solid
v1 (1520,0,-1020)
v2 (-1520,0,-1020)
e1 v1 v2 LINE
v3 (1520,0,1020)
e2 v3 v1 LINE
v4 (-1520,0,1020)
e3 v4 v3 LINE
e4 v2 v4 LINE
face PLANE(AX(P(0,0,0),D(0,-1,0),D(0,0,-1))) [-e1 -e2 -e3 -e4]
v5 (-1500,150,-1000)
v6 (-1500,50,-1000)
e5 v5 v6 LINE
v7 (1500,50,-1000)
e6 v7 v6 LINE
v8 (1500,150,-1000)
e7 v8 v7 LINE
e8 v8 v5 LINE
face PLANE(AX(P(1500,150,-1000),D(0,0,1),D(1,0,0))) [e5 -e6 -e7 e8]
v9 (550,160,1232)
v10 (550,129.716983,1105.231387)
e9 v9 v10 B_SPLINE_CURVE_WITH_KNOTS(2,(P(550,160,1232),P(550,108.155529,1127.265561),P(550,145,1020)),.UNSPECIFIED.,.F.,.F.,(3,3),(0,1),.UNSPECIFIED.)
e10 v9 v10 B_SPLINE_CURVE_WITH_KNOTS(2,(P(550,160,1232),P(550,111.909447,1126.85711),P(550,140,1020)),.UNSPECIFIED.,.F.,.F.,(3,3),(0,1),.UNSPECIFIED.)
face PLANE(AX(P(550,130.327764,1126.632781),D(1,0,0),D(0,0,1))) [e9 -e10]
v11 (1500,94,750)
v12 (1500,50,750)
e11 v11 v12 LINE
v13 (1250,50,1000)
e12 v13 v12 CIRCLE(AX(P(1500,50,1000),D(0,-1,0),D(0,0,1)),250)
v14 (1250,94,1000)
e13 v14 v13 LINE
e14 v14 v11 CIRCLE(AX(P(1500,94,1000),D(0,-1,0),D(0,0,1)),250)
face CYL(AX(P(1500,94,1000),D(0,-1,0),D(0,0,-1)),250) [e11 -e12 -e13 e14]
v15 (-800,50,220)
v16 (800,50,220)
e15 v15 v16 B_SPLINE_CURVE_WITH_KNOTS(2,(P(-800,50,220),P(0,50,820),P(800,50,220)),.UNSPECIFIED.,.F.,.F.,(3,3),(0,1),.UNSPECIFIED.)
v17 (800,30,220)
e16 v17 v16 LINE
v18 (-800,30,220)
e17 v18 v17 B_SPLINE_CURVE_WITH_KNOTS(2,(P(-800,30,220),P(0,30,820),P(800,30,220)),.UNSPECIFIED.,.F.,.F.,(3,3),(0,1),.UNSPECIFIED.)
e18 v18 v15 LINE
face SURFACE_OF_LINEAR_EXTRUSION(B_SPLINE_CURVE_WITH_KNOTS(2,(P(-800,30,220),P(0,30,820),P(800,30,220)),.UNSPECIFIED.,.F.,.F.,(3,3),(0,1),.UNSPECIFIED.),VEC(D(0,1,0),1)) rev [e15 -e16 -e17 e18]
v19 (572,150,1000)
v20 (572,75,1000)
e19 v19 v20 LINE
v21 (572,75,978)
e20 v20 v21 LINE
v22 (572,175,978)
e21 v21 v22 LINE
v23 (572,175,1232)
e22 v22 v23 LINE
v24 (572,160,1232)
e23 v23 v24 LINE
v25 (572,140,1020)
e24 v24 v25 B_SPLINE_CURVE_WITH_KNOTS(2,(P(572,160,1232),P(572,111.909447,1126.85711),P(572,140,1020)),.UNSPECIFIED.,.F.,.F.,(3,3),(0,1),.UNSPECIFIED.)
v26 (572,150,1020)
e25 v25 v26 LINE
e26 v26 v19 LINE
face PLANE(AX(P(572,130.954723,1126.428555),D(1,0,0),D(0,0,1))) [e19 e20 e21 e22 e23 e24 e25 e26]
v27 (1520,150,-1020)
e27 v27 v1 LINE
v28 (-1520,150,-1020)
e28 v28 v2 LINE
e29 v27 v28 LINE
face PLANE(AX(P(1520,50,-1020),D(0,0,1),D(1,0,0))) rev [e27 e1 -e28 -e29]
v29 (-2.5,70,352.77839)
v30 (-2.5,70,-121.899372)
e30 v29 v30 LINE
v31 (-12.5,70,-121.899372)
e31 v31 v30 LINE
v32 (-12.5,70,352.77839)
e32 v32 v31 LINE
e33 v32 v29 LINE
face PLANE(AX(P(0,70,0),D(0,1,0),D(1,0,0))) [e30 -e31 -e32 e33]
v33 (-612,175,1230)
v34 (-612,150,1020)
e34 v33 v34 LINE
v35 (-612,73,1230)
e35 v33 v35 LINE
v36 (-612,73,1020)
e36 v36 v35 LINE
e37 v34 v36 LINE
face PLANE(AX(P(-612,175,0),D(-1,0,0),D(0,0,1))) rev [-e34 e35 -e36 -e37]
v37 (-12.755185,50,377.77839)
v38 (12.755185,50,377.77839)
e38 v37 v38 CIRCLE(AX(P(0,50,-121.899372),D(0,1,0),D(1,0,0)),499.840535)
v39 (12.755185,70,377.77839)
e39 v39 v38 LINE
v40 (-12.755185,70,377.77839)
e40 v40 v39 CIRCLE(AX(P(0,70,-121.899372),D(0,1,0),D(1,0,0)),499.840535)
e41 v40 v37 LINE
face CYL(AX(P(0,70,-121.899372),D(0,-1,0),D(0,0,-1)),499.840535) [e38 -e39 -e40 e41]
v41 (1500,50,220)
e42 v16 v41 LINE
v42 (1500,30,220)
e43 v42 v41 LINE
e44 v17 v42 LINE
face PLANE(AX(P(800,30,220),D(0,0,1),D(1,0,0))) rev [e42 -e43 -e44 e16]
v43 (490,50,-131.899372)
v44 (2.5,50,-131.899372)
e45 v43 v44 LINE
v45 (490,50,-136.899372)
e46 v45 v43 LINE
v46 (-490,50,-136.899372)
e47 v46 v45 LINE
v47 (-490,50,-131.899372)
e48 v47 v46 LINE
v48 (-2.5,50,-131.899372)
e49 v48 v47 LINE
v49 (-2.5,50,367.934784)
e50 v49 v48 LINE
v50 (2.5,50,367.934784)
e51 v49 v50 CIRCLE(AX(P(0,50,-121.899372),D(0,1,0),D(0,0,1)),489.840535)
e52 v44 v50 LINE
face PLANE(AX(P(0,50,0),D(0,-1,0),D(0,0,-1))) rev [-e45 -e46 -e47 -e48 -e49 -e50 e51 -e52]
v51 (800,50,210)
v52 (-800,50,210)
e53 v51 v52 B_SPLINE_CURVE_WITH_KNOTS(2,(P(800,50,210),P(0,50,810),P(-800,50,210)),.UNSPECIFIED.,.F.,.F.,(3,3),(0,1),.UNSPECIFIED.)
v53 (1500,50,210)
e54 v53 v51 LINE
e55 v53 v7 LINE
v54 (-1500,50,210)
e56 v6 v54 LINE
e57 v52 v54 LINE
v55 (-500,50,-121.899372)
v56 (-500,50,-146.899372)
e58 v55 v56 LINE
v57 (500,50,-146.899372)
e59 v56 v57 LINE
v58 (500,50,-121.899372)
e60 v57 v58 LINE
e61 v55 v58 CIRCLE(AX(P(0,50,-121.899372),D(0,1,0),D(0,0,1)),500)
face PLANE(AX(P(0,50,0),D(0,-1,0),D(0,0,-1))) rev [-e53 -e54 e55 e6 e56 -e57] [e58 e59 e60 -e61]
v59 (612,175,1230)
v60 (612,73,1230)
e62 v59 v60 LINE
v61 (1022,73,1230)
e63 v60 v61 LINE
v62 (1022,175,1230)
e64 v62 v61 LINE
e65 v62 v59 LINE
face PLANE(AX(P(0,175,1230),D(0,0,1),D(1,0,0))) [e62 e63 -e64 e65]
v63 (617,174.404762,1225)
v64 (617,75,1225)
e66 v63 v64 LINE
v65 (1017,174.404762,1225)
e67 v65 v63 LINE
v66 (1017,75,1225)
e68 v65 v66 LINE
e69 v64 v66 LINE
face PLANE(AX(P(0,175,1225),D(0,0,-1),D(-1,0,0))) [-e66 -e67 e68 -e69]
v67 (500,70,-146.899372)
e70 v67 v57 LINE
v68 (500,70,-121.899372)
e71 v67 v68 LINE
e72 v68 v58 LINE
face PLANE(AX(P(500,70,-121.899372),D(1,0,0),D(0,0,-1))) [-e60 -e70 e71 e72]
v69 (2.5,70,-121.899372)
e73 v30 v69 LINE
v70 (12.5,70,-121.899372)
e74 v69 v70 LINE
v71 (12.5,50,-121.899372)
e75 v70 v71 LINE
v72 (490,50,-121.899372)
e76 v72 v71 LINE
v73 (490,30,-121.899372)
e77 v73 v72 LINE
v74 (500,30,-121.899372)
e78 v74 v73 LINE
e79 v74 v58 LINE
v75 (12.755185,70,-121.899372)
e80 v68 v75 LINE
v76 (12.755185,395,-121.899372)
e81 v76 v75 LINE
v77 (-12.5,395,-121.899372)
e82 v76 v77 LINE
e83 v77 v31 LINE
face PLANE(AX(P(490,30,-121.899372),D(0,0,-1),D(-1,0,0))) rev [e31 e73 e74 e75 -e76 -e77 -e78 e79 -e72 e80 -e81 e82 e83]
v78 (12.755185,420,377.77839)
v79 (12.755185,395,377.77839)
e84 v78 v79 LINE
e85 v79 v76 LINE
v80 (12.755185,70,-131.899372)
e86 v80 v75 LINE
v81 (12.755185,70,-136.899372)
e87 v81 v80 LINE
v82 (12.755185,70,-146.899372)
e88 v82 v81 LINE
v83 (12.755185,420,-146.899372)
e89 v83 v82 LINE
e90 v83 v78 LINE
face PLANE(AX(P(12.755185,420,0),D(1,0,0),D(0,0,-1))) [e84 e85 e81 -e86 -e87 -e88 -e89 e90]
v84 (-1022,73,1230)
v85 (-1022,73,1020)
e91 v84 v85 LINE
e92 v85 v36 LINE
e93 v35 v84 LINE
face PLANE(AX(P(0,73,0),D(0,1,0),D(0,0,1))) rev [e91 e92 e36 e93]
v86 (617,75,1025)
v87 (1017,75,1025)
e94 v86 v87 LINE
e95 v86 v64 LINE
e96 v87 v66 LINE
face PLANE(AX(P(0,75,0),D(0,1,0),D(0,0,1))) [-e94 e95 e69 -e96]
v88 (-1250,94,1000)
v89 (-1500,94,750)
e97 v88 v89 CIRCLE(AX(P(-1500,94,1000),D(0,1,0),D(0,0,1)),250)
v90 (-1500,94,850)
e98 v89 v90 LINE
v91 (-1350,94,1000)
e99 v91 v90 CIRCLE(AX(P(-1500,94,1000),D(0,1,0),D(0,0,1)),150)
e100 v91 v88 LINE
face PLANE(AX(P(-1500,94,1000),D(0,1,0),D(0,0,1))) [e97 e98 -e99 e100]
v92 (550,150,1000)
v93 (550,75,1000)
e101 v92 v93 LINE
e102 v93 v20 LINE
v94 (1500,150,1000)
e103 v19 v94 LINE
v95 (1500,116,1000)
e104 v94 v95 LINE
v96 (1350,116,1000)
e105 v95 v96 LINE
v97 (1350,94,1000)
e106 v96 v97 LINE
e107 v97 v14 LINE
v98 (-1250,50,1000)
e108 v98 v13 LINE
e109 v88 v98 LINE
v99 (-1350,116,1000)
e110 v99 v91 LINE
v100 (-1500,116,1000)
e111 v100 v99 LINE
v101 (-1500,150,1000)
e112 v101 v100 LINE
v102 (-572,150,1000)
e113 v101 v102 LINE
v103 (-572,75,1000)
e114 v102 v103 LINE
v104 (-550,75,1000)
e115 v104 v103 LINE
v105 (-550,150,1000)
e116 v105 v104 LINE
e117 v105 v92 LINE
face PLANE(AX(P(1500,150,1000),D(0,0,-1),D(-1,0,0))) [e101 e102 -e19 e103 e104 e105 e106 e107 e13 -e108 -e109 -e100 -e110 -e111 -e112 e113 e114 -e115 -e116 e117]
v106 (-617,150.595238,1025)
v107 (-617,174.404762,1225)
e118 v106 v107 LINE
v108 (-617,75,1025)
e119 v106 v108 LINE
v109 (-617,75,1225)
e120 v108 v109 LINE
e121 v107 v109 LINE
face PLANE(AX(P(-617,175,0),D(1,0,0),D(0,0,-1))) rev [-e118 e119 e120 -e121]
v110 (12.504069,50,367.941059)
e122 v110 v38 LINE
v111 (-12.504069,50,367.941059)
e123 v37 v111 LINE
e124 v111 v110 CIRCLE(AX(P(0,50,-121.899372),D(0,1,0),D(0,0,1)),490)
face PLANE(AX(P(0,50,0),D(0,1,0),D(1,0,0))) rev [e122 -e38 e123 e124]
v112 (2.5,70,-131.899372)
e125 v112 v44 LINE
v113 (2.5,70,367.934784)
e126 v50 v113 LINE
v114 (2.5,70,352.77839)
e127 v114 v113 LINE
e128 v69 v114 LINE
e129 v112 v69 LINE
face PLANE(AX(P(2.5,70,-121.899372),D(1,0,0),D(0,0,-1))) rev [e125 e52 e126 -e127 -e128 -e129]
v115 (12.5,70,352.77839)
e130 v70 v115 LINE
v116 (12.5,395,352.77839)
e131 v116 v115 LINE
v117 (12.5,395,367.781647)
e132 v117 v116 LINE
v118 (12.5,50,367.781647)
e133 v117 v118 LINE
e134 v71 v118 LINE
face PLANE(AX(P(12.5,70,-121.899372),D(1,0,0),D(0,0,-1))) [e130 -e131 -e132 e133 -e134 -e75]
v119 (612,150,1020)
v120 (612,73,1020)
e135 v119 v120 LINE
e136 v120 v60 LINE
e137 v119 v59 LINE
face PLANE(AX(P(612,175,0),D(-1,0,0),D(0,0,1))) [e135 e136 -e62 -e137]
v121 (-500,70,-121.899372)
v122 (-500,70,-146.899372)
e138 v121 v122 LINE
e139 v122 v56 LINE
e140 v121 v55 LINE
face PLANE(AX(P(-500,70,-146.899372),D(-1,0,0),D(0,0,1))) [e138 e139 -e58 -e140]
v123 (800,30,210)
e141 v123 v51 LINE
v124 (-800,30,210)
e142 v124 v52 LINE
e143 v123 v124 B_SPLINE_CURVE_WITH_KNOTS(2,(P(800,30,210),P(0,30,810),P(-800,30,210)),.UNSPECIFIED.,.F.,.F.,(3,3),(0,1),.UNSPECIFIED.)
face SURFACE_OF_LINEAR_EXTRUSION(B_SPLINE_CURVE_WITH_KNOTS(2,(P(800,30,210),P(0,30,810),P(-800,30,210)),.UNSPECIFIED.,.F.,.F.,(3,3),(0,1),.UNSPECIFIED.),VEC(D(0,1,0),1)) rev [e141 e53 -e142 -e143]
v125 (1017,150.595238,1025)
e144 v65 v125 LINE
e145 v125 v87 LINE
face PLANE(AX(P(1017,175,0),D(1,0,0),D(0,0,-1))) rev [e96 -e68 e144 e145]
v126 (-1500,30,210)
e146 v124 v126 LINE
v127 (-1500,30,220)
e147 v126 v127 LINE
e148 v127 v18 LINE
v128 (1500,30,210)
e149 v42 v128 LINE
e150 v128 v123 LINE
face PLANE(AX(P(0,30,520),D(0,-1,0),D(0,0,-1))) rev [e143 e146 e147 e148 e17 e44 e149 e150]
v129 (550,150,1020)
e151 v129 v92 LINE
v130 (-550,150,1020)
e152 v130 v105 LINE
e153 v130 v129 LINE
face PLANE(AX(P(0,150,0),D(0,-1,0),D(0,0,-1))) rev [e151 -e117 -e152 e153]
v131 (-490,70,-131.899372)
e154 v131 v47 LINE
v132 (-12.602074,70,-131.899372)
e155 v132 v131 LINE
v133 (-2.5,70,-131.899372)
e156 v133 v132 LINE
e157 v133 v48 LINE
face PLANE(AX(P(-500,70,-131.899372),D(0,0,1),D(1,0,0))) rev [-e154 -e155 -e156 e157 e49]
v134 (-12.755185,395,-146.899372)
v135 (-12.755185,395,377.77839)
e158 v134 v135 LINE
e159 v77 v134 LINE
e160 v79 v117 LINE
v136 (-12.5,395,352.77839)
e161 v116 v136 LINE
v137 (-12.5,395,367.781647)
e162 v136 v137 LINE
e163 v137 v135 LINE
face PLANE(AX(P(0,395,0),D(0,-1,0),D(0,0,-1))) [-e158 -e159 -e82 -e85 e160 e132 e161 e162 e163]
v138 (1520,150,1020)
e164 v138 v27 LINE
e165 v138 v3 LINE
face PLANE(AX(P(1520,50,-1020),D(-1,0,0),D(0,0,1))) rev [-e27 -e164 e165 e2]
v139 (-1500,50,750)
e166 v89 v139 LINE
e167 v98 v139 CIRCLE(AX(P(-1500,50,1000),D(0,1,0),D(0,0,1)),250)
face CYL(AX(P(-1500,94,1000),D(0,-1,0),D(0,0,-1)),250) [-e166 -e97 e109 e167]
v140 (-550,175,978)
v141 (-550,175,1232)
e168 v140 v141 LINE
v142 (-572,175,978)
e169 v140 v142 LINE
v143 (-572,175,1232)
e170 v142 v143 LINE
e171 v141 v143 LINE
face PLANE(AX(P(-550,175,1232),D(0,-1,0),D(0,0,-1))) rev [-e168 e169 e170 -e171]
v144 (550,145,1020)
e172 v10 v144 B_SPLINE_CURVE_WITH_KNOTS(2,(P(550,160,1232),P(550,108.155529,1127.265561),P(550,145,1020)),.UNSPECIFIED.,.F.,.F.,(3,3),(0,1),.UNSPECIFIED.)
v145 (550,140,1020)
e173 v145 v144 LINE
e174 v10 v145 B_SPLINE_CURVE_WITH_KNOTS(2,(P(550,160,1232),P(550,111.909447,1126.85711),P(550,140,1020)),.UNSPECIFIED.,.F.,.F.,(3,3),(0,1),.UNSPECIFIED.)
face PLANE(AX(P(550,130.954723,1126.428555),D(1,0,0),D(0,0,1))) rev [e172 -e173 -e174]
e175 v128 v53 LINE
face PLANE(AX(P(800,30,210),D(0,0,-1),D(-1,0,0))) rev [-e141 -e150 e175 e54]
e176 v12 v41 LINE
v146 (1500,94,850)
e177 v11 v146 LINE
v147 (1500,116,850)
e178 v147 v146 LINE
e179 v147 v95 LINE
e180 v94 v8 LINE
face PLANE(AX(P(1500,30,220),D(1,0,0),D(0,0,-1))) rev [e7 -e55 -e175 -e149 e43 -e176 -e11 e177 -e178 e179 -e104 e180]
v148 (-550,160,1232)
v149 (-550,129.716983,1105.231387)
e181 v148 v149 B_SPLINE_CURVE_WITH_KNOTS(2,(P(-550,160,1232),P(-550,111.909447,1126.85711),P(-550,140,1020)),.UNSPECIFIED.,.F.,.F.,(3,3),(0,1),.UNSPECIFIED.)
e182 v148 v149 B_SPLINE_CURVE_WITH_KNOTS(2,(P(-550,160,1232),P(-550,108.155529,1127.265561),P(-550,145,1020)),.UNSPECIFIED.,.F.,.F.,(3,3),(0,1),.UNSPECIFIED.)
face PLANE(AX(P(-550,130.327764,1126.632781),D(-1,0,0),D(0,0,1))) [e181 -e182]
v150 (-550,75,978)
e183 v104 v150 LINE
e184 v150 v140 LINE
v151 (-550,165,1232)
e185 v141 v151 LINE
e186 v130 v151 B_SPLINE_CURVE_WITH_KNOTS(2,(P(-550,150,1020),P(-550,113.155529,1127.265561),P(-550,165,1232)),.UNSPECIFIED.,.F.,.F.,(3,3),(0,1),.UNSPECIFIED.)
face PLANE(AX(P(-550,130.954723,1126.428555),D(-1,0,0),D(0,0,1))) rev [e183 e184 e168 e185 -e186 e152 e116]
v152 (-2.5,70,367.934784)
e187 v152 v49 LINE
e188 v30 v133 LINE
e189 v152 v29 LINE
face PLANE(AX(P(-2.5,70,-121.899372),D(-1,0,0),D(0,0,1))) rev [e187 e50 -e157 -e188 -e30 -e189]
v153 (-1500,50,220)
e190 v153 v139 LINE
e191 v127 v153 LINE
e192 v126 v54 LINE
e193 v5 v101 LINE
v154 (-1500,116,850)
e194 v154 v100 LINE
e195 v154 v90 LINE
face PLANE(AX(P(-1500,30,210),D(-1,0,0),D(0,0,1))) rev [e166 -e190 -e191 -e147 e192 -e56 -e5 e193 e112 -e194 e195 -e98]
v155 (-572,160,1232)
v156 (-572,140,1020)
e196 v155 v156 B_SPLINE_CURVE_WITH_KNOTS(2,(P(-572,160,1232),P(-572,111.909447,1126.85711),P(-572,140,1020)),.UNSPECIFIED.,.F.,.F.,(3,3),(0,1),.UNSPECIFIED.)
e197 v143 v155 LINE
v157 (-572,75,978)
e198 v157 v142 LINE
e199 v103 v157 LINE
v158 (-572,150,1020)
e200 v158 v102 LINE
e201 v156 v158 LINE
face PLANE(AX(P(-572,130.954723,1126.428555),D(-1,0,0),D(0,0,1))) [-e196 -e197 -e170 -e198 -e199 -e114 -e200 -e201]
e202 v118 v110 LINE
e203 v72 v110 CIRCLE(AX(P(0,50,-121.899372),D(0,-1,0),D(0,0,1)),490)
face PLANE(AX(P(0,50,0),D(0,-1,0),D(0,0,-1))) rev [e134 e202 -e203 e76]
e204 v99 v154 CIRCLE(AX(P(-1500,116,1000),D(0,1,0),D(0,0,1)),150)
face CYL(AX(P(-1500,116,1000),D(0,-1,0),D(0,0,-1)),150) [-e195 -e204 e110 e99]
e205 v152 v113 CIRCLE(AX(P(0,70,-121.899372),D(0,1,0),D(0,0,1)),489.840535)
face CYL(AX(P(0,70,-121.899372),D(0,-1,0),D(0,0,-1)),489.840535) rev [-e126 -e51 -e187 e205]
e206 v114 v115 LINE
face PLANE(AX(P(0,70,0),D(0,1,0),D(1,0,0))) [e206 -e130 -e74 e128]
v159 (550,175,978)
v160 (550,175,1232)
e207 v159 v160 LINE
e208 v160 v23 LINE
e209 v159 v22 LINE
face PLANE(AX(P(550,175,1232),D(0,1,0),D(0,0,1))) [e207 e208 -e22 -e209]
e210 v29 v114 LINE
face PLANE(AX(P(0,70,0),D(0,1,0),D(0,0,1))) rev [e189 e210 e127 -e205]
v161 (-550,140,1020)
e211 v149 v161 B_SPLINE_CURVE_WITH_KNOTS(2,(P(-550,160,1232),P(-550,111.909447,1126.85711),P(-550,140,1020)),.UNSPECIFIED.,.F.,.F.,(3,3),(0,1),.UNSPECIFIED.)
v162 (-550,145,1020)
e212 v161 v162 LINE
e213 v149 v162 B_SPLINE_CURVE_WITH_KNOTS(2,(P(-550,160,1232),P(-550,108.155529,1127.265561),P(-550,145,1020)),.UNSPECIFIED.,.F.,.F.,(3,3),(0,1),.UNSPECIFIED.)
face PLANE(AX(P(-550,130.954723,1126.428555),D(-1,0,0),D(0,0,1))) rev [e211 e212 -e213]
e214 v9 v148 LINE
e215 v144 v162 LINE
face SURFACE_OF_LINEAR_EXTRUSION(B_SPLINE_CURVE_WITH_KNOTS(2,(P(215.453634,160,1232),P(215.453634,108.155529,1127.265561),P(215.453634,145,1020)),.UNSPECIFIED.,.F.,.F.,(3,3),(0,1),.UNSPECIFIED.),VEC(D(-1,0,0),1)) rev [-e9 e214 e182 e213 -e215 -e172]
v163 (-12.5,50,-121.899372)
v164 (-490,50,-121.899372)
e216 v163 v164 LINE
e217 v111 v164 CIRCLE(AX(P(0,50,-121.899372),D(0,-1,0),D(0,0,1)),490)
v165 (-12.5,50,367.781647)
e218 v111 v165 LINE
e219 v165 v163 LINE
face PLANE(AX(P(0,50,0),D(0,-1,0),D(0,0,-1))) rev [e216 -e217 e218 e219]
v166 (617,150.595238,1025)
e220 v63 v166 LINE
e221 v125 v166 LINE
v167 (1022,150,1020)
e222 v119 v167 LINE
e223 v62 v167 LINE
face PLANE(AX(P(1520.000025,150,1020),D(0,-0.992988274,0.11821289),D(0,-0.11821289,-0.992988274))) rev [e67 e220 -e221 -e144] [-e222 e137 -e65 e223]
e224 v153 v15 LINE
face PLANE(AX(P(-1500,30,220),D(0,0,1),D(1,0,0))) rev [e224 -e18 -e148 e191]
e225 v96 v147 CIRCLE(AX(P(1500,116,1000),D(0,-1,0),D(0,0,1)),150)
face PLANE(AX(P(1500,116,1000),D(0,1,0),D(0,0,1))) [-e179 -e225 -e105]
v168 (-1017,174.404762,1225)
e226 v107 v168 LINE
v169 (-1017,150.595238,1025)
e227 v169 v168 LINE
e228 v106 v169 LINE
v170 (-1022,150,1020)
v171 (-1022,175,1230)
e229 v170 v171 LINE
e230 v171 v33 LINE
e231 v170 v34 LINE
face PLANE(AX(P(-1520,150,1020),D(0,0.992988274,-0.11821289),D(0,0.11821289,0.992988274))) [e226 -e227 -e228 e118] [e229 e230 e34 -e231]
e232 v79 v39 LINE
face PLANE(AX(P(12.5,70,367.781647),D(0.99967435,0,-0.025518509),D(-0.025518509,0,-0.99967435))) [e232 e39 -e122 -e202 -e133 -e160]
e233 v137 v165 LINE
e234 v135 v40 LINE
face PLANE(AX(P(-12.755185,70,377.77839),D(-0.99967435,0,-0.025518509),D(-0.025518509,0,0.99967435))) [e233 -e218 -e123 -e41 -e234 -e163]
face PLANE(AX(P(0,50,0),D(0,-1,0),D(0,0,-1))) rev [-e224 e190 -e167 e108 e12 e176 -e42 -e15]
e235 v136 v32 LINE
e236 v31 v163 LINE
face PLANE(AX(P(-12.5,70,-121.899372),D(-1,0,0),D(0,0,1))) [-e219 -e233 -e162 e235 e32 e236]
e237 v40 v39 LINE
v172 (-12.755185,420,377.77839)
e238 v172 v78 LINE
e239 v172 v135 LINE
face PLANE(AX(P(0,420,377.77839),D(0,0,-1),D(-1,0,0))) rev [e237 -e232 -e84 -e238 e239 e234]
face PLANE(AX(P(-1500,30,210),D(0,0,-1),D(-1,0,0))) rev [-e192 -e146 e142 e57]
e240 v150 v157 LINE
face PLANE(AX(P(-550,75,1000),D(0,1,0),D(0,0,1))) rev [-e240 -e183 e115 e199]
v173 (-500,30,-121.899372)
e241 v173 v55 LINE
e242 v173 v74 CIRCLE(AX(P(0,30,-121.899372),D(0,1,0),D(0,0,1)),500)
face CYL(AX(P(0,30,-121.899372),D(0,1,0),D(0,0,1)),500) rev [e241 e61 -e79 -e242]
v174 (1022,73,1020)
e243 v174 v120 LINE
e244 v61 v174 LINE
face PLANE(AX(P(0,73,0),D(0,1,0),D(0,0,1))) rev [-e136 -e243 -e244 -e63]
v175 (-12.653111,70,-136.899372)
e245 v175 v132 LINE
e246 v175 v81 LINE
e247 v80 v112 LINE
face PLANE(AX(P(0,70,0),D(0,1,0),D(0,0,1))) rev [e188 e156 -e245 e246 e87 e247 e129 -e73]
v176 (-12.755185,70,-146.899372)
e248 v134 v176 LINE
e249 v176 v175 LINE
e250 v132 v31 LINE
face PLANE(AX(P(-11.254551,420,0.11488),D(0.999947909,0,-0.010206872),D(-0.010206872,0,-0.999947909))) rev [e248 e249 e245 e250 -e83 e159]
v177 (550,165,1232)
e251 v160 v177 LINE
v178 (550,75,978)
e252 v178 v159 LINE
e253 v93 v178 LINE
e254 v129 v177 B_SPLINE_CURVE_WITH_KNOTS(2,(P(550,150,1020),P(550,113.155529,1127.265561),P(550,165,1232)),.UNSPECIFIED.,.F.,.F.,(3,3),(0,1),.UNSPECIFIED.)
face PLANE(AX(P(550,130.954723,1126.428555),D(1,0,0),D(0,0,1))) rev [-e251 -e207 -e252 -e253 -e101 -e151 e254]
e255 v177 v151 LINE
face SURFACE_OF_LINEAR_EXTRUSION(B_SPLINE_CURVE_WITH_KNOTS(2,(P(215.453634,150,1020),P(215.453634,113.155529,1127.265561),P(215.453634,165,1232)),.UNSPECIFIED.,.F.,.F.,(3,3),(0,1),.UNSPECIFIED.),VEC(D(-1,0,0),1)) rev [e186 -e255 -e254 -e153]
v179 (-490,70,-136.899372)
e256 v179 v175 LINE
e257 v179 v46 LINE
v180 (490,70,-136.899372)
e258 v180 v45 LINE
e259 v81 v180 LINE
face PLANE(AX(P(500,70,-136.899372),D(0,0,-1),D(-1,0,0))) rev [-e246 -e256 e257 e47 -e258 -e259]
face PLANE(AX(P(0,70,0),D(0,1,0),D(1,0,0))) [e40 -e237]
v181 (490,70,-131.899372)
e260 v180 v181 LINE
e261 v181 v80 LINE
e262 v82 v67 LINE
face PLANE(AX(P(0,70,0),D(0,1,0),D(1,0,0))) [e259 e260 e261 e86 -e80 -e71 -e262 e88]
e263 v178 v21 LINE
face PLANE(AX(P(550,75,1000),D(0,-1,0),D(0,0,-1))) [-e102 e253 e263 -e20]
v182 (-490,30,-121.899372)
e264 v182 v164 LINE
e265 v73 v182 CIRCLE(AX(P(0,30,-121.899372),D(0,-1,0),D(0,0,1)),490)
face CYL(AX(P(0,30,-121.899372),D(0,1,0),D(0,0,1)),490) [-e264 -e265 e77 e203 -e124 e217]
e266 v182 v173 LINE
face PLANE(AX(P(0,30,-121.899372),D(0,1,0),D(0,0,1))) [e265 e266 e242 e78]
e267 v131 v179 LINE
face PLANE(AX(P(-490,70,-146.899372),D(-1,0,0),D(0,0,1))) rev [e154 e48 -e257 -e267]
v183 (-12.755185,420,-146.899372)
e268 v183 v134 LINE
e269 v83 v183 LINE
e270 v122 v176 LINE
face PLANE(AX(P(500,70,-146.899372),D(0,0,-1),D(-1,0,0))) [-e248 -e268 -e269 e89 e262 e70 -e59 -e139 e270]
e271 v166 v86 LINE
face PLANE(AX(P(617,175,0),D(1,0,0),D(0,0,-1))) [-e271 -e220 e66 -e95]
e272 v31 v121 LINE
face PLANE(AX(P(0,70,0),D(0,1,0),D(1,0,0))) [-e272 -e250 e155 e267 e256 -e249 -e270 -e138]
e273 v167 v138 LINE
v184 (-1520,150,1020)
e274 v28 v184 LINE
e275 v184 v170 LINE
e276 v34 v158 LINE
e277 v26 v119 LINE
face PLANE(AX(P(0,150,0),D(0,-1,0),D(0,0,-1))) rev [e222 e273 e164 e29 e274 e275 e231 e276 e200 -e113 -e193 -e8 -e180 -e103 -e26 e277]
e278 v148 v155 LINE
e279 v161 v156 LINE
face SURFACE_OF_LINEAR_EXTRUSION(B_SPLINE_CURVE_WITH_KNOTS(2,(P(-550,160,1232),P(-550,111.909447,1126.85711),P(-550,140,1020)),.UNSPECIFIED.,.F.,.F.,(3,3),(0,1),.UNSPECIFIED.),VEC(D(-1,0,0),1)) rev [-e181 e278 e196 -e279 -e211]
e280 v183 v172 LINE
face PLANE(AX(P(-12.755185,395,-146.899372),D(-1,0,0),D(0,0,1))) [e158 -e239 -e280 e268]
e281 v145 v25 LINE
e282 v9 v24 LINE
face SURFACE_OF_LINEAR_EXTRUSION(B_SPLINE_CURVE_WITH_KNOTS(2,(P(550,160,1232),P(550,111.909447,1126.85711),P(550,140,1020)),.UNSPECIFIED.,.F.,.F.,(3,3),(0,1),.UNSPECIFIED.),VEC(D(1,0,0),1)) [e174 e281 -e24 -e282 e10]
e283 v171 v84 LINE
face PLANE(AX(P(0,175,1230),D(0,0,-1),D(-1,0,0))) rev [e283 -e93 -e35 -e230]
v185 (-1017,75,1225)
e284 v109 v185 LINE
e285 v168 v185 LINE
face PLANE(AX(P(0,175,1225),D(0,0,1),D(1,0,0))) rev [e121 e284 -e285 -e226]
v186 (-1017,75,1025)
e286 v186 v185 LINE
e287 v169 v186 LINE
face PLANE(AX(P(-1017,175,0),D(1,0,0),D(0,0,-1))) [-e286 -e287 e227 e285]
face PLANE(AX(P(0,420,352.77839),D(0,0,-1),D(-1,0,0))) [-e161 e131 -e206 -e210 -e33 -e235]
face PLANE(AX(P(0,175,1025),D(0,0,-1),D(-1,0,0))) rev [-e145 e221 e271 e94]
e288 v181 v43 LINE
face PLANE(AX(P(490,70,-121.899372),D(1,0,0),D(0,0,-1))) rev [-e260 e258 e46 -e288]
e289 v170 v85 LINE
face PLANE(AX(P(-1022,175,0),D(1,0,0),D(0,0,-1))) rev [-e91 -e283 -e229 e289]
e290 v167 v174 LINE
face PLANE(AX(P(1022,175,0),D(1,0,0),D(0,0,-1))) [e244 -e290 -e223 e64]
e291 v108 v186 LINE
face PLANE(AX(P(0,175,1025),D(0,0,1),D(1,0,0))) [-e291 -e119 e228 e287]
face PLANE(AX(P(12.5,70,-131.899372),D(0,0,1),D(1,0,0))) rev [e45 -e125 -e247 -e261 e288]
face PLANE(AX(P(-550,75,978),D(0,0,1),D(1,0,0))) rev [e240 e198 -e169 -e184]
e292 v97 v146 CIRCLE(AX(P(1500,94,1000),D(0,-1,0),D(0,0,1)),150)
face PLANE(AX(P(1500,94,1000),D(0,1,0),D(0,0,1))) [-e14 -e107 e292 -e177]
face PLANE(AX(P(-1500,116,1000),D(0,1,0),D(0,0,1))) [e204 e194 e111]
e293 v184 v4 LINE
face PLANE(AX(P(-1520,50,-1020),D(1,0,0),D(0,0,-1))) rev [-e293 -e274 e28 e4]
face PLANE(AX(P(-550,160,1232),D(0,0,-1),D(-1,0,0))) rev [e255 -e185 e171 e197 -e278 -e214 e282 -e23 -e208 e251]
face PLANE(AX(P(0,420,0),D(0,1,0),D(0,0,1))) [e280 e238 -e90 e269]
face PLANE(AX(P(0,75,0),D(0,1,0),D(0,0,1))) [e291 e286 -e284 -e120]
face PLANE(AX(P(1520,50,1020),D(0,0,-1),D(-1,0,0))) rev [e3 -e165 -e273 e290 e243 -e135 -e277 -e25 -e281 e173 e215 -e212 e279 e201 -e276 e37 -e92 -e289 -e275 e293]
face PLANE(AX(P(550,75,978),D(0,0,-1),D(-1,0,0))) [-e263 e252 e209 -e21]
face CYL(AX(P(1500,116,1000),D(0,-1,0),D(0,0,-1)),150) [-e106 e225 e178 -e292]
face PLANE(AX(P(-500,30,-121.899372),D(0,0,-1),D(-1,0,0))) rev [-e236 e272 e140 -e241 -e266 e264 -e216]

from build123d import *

# Parameters (mm, degrees)
ESQUISSE1_W             = 3040
ESQUISSE1_H             = 2040
BASE_TABLE_DEPTH        = 50
LIGNE_DEPTH             = 20
ESQUISSE3_W             = 3040
ESQUISSE3_H             = 2040
ESQUISSE3_W_2           = 3000
ESQUISSE3_H_2           = 2000
EXT_DEPTH               = 100
COQ_BAS_DEPTH           = 44
COQ_HAUT_DEPTH          = 22
POISSON_START           = -75
ESQUISSE8_W             = 410
ESQUISSE8_H             = 210
ESQUISSE8_W_2           = 400
ESQUISSE8_H_2           = 200
POISSON_EXT_DEPTH       = 100
ESQUISSE9_W             = 410
ESQUISSE9_H             = 210
POISSON_FOND_DEPTH      = 2
MILIEU_VIDE_DEPTH       = 20
MILIEU_BOIS_DEPTH       = 20
MILIEU_BOIS_2_DEPTH     = 350
ESQUISSE13_W            = 25.510370176
ESQUISSE13_H            = 524.677762122
MILIEU_BOIS_3_DEPTH     = 25
ENL_V_START             = -411
ENL_V_MAT_EXTRU_1_DEPTH = 3267.006830114
BOSS_EXTRU_1_DEPTH      = 22
BOSS_EXTRU_2_DEPTH      = 550


# Read off the part's stored shape, not the designer's step: MILIEU BOIS 
with BuildPart() as part:
    # Esquisse1 → BASE TABLE (new body)
    with BuildSketch(Plane(origin=(0, 0, 0), x_dir=(1, 0, 0), z_dir=(0, 1, 0))):
        Rectangle(ESQUISSE1_W, ESQUISSE1_H)
    extrude(amount=BASE_TABLE_DEPTH)

    # Esquisse2 → LIGNE (cut)
    with BuildSketch(Plane(origin=(0, 50, 0), x_dir=(1, 0, 0), z_dir=(0, 1, 0))):
        with BuildLine():
            Line((-1500, -210), (-1500, -220))
            Line((-1500, -220), (-800, -220))
            add(Edge.make_bspline(
                [(-800, -220), (0, -820), (800, -220)],
                knots=[0, 0, 0, 1, 1, 1], degree=2))
            Line((800, -220), (1500, -220))
            Line((1500, -220), (1500, -210))
            Line((1500, -210), (800, -210))
            add(Edge.make_bspline(
                [(-800, -210), (0, -810), (800, -210)],
                knots=[0, 0, 0, 1, 1, 1], degree=2))
            Line((-800, -210), (-1500, -210))
        make_face()
    extrude(amount=-LIGNE_DEPTH, mode=Mode.SUBTRACT)

    # Esquisse3 → EXT (add)
    with BuildSketch(Plane(origin=(0, 50, 0), x_dir=(1, 0, 0), z_dir=(0, 1, 0))):
        Rectangle(ESQUISSE3_W, ESQUISSE3_H)
        Rectangle(ESQUISSE3_W_2, ESQUISSE3_H_2, mode=Mode.SUBTRACT)
    extrude(amount=EXT_DEPTH)

    # Esquisse4 → COQ - BAS (add)
    with BuildSketch(Plane(origin=(0, 50, 0), x_dir=(1, 0, 0), z_dir=(0, 1, 0))):
        with BuildLine():
            Line((-1500, -750), (-1500, -1000))
            Line((-1500, -1000), (-1250, -1000))
            ThreePointArc((-1250, -1000), (-1323.223304703, -823.223304703), (-1500, -750))
        make_face()
    coq_bas = extrude(amount=COQ_BAS_DEPTH)

    # Esquisse7 → COQ - HAUT (add)
    with BuildSketch(Plane(origin=(0, 94, 0), x_dir=(1, 0, 0), z_dir=(0, 1, 0))):
        with BuildLine():
            Line((-1500, -850), (-1500, -1000))
            Line((-1500, -1000), (-1350, -1000))
            ThreePointArc((-1350, -1000), (-1393.933982822, -893.933982822), (-1500, -850))
        make_face()
    coq_haut = extrude(amount=COQ_HAUT_DEPTH)

    # SYM -COQ: COQ - BAS, COQ - HAUT across plane
    add(coq_bas.mirror(Plane.ZY))
    add(coq_haut.mirror(Plane.ZY))

    # Esquisse8 → POISSON EXT (add)
    with BuildSketch(Plane(origin=(0, 150, 0), x_dir=(1, 0, 0), z_dir=(0, 1, 0)).offset(POISSON_START)):
        with Locations((-817, -1125)):
            Rectangle(ESQUISSE8_W, ESQUISSE8_H)
        with Locations((-817, -1125)):
            Rectangle(ESQUISSE8_W_2, ESQUISSE8_H_2, mode=Mode.SUBTRACT)
    poisson_ext = extrude(amount=POISSON_EXT_DEPTH)

    # Esquisse9 → POISSON FOND (add)
    with BuildSketch(Plane.XZ.offset(-75)):
        with Locations((-817, 1125)):
            Rectangle(ESQUISSE9_W, ESQUISSE9_H)
    poisson_fond = extrude(amount=POISSON_FOND_DEPTH)

    # Esquisse10 → MILIEU VIDE (cut)
    with BuildSketch(Plane(origin=(0, 50, 0), x_dir=(1, 0, 0), z_dir=(0, 1, 0))):
        with BuildLine():
            Line((-500, 121.899372106), (-490, 121.899372106))
            ThreePointArc((-490, 121.899372106), (0, -368.100627894), (490, 121.899372106))
            Line((490, 121.899372106), (500, 121.899372106))
            ThreePointArc((500, 121.899372106), (0, -378.100627894), (-500, 121.899372106))
        make_face()
    extrude(amount=-MILIEU_VIDE_DEPTH, mode=Mode.SUBTRACT)

    # MILIEU BOIS outline → MILIEU BOIS (add)
    with BuildSketch(Plane(origin=(0, 50, 0), x_dir=(1, 0, 0), z_dir=(0, 1, 0))):
        with BuildLine():
            Line((-500, 121.899372106), (-12.5, 121.899372106))
            Line((-12.5, 121.899372106), (-12.5, -367.781646517))
            Line((-12.5, -367.781646517), (-12.755185088, -377.778390016))
            ThreePointArc((-12.755185088, -377.778390016), (0, -377.941163171), (12.755185088, -377.778390016))
            Line((12.755185088, -377.778390016), (12.5, -367.781646518))
            Line((12.5, -367.781646518), (12.5, 121.899372106))
            Line((12.5, 121.899372106), (500, 121.899372106))
            Line((500, 121.899372106), (500, 146.899372106))
            Line((500, 146.899372106), (-500, 146.899372106))
            Line((-500, 146.899372106), (-500, 121.899372106))
        make_face()
        with BuildLine():
            Line((2.5, 131.899372106), (2.5, -367.934783502))
            ThreePointArc((2.5, -367.934783502), (0, -367.941163171), (-2.5, -367.934783502))
            Line((-2.5, -367.934783502), (-2.5, 131.899372106))
            Line((-2.5, 131.899372106), (-490, 131.899372106))
            Line((-490, 131.899372106), (-490, 136.899372106))
            Line((-490, 136.899372106), (490, 136.899372106))
            Line((490, 136.899372106), (490, 131.899372106))
            Line((490, 131.899372106), (2.5, 131.899372106))
        make_face(mode=Mode.SUBTRACT)
    extrude(amount=MILIEU_BOIS_DEPTH)

    # Esquisse12 → MILIEU BOIS 2 (add)
    with BuildSketch(Plane(origin=(0, 70, 0), x_dir=(1, 0, 0), z_dir=(0, 1, 0))):
        Polygon((-12.602074035, 131.899372106), (-12.5, 121.899372106), (-2.5, 121.899372106), (-2.5, 131.899372106), align=None)
        Polygon((-2.5, 131.899372106), (-2.5, 121.899372106), (2.5, 121.899372106), (2.5, 131.899372106), (12.755185088, 131.899372106), (12.755185088, 136.899372106), (-12.653111053, 136.899372106), (-12.602074035, 131.899372106), align=None)
        Polygon((2.5, 121.899372106), (12.5, 121.899372106), (12.755185088, 121.899372106), (12.755185088, 131.899372106), (2.5, 131.899372106), align=None)
        Polygon((-12.755185088, 146.899372106), (-12.653111053, 136.899372106), (12.755185088, 136.899372106), (12.755185088, 146.899372106), align=None)
        with BuildLine():
            Line((2.5, -352.778390016), (-2.5, -352.778390016))
            Line((-2.5, -352.778390016), (-2.5, -367.934783502))
            ThreePointArc((-2.5, -367.934783502), (0, -367.941163171), (2.5, -367.934783502))
            Line((2.5, -367.934783502), (2.5, -352.778390016))
        make_face()
        with BuildLine():
            Line((-12.5, -367.781646517), (-12.755185088, -377.778390016))
            Line((-12.755185088, -377.778390016), (12.755185088, -377.778390016))
            Line((12.755185088, -377.778390016), (12.5, -367.781646518))
            Line((12.5, -367.781646518), (12.5, -352.778390016))
            Line((12.5, -352.778390016), (2.5, -352.778390016))
            Line((2.5, -352.778390016), (2.5, -367.934783502))
            ThreePointArc((2.5, -367.934783502), (0, -367.941163171), (-2.5, -367.934783502))
            Line((-2.5, -367.934783502), (-2.5, -352.778390016))
            Line((-2.5, -352.778390016), (-12.5, -352.778390016))
            Line((-12.5, -352.778390016), (-12.5, -367.781646517))
        make_face()
    extrude(amount=MILIEU_BOIS_2_DEPTH)

    # Esquisse13 → MILIEU BOIS 3 (add)
    with BuildSketch(Plane(origin=(0, 420, 0), x_dir=(1, 0, 0), z_dir=(0, 1, 0))):
        with Locations((0, -115.439508955)):
            Rectangle(ESQUISSE13_W, ESQUISSE13_H)
    extrude(amount=-MILIEU_BOIS_3_DEPTH)

    # Esquisse16 → Enlèv. mat.-Extru.1 (cut)
    with BuildSketch(Plane.ZY.offset(1022).offset(ENL_V_START)):
        Polygon((1020, 150), (1230, 175), (1020, 175), align=None)
    enl_v_mat_extru_1 = extrude(amount=ENL_V_MAT_EXTRU_1_DEPTH, mode=Mode.SUBTRACT)

    # Esquisse18 → Boss.-Extru.1 (add)
    with BuildSketch(Plane(origin=(-572, 0, 0), x_dir=(0, 0, -1), z_dir=(1, 0, 0))):
        with BuildLine():
            Line((-1020, 140), (-1020, 150))
            Line((-1020, 150), (-1000, 150))
            Line((-1000, 150), (-1000, 75))
            Line((-1000, 75), (-978, 75))
            Line((-978, 75), (-978, 175))
            Line((-978, 175), (-1232, 175))
            Line((-1232, 175), (-1232, 160))
            add(Edge.make_bspline(
                [(-1232, 160), (-1126.857109978, 111.909446545), (-1020, 140)],
                knots=[0, 0, 0, 1, 1, 1], degree=2))
        make_face()
    boss_extru_1 = extrude(amount=BOSS_EXTRU_1_DEPTH)

    # Esquisse20 → Boss.-Extru.2 (add)
    with BuildSketch(Plane(origin=(-550, 0, 0), x_dir=(0, 0, -1), z_dir=(1, 0, 0))):
        with BuildLine():
            Line((-1232, 165), (-1232, 160))
            add(Edge.make_bspline(
                [(-1232, 160), (-1127.265561017, 108.15552864), (-1020, 145)],
                knots=[0, 0, 0, 1, 1, 1], degree=2))
            Line((-1020, 145), (-1020, 150))
            add(Edge.make_bspline(
                [(-1020, 150), (-1127.265561017, 113.15552864), (-1232, 165)],
                knots=[0, 0, 0, 1, 1, 1], degree=2))
        make_face()
    boss_extru_2 = extrude(amount=BOSS_EXTRU_2_DEPTH)

    # Symétrie1: POISSON EXT, POISSON FOND, Enlèv. mat.-Extru.1, Boss.-Extru.1, Boss.-Extru.2 across plane
    add(poisson_ext.mirror(Plane.ZY))
    add(poisson_fond.mirror(Plane.ZY))
    add(enl_v_mat_extru_1.mirror(Plane.ZY), mode=Mode.SUBTRACT)
    add(boss_extru_1.mirror(Plane.ZY))
    add(boss_extru_2.mirror(Plane.ZY))


solid = part.part
